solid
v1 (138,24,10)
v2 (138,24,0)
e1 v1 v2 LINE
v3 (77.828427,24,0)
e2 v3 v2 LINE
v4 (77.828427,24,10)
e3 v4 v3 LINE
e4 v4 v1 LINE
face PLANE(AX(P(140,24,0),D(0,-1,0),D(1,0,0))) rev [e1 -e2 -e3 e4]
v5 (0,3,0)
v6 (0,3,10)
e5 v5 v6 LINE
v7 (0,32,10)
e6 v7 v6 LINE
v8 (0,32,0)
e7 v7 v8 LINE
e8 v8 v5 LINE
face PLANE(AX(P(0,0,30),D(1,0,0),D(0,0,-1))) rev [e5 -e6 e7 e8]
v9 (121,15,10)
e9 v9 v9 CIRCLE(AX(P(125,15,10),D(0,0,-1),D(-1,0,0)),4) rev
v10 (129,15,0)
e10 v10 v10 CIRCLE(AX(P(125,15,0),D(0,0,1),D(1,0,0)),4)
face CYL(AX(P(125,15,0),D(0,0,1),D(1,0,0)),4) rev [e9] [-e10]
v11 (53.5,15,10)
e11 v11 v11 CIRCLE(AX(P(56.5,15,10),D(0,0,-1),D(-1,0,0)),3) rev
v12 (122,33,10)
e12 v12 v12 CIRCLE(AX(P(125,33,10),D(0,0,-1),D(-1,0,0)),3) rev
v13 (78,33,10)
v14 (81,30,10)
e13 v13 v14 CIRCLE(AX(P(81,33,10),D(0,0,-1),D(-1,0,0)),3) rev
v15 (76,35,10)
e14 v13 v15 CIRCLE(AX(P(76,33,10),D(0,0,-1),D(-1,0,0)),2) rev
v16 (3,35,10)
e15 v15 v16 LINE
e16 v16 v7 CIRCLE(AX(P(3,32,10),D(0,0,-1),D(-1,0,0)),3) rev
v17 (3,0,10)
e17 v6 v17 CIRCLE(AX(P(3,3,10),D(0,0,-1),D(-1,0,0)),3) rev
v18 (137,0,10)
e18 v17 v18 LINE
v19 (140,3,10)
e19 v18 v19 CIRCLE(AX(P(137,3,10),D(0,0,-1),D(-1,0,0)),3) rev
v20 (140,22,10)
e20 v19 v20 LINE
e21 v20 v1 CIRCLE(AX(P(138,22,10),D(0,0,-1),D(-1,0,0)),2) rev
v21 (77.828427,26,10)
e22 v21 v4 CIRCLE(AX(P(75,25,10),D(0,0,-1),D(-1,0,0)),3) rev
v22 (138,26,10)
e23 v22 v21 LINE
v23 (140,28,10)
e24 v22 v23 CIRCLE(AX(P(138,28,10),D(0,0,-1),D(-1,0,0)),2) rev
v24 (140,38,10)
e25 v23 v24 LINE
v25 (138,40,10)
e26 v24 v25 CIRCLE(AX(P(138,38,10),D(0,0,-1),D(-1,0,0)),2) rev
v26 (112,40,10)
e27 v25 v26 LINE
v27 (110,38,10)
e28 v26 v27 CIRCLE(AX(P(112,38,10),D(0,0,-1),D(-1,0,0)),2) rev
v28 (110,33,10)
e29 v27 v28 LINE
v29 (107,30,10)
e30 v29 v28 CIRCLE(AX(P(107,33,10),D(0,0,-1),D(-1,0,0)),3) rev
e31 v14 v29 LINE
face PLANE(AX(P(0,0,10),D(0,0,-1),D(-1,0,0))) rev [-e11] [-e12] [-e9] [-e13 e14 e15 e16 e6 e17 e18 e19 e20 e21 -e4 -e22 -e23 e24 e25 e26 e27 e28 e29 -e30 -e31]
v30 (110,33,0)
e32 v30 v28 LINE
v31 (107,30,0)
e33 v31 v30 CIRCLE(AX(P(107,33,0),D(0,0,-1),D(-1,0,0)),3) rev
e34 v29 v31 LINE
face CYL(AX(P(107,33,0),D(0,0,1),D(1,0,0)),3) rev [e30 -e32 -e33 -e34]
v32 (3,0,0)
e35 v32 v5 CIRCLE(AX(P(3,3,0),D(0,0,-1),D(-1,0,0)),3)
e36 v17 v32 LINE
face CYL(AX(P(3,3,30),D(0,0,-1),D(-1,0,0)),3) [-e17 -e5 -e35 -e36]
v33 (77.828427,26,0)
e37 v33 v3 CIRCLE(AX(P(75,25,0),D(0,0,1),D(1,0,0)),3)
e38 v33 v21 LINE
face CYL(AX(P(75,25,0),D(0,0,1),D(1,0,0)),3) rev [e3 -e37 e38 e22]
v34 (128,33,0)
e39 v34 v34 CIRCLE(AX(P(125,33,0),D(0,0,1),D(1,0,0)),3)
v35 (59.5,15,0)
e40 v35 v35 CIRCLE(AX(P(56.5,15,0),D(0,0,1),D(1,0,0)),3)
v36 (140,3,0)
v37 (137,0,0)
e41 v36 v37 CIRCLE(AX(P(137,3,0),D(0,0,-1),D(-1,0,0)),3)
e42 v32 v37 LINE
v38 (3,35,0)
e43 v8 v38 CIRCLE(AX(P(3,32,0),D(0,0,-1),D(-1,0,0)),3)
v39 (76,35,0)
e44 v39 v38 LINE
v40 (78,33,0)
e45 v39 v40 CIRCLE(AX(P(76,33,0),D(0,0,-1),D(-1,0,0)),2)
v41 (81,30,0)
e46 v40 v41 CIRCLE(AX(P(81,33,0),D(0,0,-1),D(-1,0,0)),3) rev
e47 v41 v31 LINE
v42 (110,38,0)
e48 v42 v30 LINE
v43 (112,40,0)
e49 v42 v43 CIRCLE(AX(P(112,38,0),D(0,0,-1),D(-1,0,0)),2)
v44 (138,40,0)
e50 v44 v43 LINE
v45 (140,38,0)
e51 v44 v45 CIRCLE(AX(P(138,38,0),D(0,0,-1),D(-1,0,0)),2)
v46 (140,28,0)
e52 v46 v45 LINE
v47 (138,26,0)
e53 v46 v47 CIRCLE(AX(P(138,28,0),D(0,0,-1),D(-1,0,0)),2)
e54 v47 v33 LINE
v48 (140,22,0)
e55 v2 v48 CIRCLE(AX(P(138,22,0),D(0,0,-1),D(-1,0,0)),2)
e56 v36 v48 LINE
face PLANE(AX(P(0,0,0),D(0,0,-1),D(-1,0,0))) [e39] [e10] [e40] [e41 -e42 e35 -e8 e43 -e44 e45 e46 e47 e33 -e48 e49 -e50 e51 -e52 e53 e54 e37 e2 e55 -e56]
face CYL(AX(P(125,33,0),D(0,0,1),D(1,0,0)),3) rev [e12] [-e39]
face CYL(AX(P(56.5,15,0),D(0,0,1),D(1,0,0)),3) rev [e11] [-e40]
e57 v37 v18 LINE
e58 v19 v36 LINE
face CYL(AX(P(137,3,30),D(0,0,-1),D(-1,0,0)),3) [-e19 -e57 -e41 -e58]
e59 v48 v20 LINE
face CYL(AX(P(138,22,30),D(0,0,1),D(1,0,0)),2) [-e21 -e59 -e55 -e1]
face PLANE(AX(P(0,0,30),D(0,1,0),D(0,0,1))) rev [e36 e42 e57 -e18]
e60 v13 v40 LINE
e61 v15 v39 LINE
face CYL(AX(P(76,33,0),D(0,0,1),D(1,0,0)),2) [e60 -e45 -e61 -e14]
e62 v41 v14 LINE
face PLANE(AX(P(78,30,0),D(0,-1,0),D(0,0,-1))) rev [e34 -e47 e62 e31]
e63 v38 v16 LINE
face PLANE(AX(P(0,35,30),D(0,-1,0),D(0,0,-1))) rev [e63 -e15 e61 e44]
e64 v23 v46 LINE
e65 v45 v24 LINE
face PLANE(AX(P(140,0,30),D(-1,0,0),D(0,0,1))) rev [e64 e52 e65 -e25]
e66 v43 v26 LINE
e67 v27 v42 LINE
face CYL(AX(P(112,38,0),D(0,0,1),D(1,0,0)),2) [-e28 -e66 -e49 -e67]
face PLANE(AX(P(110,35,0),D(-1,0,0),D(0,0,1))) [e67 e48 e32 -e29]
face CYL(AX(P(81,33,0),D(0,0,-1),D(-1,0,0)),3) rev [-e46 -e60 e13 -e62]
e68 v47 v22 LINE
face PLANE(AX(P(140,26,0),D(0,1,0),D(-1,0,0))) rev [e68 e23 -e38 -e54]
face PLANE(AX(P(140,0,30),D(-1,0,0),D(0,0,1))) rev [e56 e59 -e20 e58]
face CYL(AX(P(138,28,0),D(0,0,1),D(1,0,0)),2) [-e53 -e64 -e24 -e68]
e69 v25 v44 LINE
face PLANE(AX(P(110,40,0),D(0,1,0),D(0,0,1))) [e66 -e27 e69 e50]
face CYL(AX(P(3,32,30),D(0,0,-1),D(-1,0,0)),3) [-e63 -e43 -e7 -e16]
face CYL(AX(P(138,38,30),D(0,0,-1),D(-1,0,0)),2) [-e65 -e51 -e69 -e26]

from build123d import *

# Parameters (mm, degrees)
ESQUISSE1_W                  = 140
ESQUISSE1_H                  = 35
BOSS_EXTRU_1_DEPTH           = 30
ESQUISSE2_W                  = 33
ESQUISSE2_H                  = 35
ENL_V_MAT_EXTRU_1_DEPTH      = 20
ESQUISSE3_W                  = 30
ESQUISSE3_H                  = 5
BOSS_EXTRU_2_DEPTH           = 30
ENL_V_MAT_EXTRU_2_DEPTH      = 149.660687473
ENL_V_MAT_EXTRU_2_DEPTH_BACK = 149.660687473
ESQUISSE4_R                  = 3
ENL_V_MAT_EXTRU_3_DEPTH      = 149.660687473
ENL_V_MAT_EXTRU_3_DEPTH_BACK = 149.660687473
ESQUISSE5_W                  = 65
ESQUISSE5_H                  = 2
ENL_V_MAT_EXTRU_4_DEPTH      = 149.660687473
ENL_V_MAT_EXTRU_4_DEPTH_BACK = 149.660687473
ESQUISSE6_W                  = 32
ESQUISSE6_H                  = 5
CONG_1_R                     = 3
ENL_V_MAT_EXTRU_6_DEPTH      = 15
ENL_V_MAT_EXTRU_5_DEPTH      = 149.660687473
ENL_V_MAT_EXTRU_5_DEPTH_BACK = 149.660687473
ESQUISSE7_R                  = 4
CONG_2_R                     = 3
CONG_3_R                     = 2
ENL_V_MAT_EXTRU_8_DEPTH      = 149.660687473
ENL_V_MAT_EXTRU_8_DEPTH_BACK = 149.660687473
ESQUISSE10_R                 = 3
ESQUISSE9_W                  = 140
ESQUISSE9_H                  = 40
ENL_V_MAT_EXTRU_7_DEPTH      = 20


with BuildPart() as part:
    # Esquisse1 → Boss.-Extru.1 (new body)
    with BuildSketch(Plane.XY):
        with Locations((70, 17.5)):
            Rectangle(ESQUISSE1_W, ESQUISSE1_H)
    extrude(amount=BOSS_EXTRU_1_DEPTH)

    # Esquisse2 → Enlèv. mat.-Extru.1 (cut)
    with BuildSketch(Plane.XY.offset(30)):
        with Locations((25, 17.5)):
            Rectangle(ESQUISSE2_W, ESQUISSE2_H)
    extrude(amount=-ENL_V_MAT_EXTRU_1_DEPTH, mode=Mode.SUBTRACT)

    # Esquisse3 → Boss.-Extru.2 (add)
    with BuildSketch(Plane.XY.offset(30)):
        with Locations((125, 37.5)):
            Rectangle(ESQUISSE3_W, ESQUISSE3_H)
    extrude(amount=-BOSS_EXTRU_2_DEPTH)

    # Esquisse4 → Enlèv. mat.-Extru.2 (cut, two sides: drawn at the far end of the back side and taken through both)
    with BuildSketch(Plane.XY.offset(30).offset(-ENL_V_MAT_EXTRU_2_DEPTH_BACK)):
        with Locations((75, 25)):
            Circle(ESQUISSE4_R)
    extrude(amount=ENL_V_MAT_EXTRU_2_DEPTH + ENL_V_MAT_EXTRU_2_DEPTH_BACK, mode=Mode.SUBTRACT)

    # Esquisse5 → Enlèv. mat.-Extru.3 (cut, two sides: drawn at the far end of the back side and taken through both)
    with BuildSketch(Plane.XY.offset(30).offset(-ENL_V_MAT_EXTRU_3_DEPTH_BACK)):
        with Locations((107.5, 25)):
            Rectangle(ESQUISSE5_W, ESQUISSE5_H)
    extrude(amount=ENL_V_MAT_EXTRU_3_DEPTH + ENL_V_MAT_EXTRU_3_DEPTH_BACK, mode=Mode.SUBTRACT)

    # Esquisse6 → Enlèv. mat.-Extru.4 (cut, two sides: drawn at the far end of the back side and taken through both)
    with BuildSketch(Plane.XY.offset(30).offset(-ENL_V_MAT_EXTRU_4_DEPTH_BACK)):
        with Locations((94, 32.5)):
            Rectangle(ESQUISSE6_W, ESQUISSE6_H)
    extrude(amount=ENL_V_MAT_EXTRU_4_DEPTH + ENL_V_MAT_EXTRU_4_DEPTH_BACK, mode=Mode.SUBTRACT)

    # Congé1
    cong_1_edges = [part.edges().sort_by_distance(p)[0] for p in [
        (78, 30, 15),
        (110, 30, 15),
    ]]
    fillet(cong_1_edges, radius=CONG_1_R)

    # Esquisse8 → Enlèv. mat.-Extru.6 (cut)
    with BuildSketch(Plane.XY.offset(30)):
        Polygon((72, 0), (140, 0), (140, 24), (106.275552162, 24), align=None)
    extrude(amount=-ENL_V_MAT_EXTRU_6_DEPTH, mode=Mode.SUBTRACT)

    # Esquisse7 → Enlèv. mat.-Extru.5 (cut, two sides: drawn at the far end of the back side and taken through both)
    with BuildSketch(Plane.XY.offset(30).offset(-ENL_V_MAT_EXTRU_5_DEPTH_BACK)):
        with Locations((125, 15)):
            Circle(ESQUISSE7_R)
    extrude(amount=ENL_V_MAT_EXTRU_5_DEPTH + ENL_V_MAT_EXTRU_5_DEPTH_BACK, mode=Mode.SUBTRACT)

    # Congé2
    cong_2_edges = [part.edges().sort_by_distance(p)[0] for p in [
        (140, 0, 7.5),
        (72, 0, 22.5),
        (0, 35, 15),
        (0, 0, 15),
    ]]
    fillet(cong_2_edges, radius=CONG_2_R)

    # Congé3
    cong_3_edges = [part.edges().sort_by_distance(p)[0] for p in [
        (106.275552162, 24, 22.5),
        (8.5, 0, 20),
        (8.5, 35, 20),
        (41.5, 35, 20),
        (41.5, 0, 20),
        (110, 40, 15),
        (140, 40, 15),
        (140, 26, 15),
        (140, 24, 7.5),
        (78, 35, 15),
    ]]
    fillet(cong_3_edges, radius=CONG_3_R - 0.0001)  # a hair under: the kernel refuses the full size

    # Esquisse10 → Enlèv. mat.-Extru.8 (cut, two sides: drawn at the far end of the back side and taken through both)
    with BuildSketch(Plane.XY.offset(30).offset(-ENL_V_MAT_EXTRU_8_DEPTH_BACK)):
        with Locations((56.5, 15)):
            Circle(ESQUISSE10_R)
        with Locations((125, 33)):
            Circle(ESQUISSE10_R)
    extrude(amount=ENL_V_MAT_EXTRU_8_DEPTH + ENL_V_MAT_EXTRU_8_DEPTH_BACK, mode=Mode.SUBTRACT)

    # Esquisse9 → Enlèv. mat.-Extru.7 (cut)
    with BuildSketch(Plane.XY.offset(30)):
        with Locations((70, 20)):
            Rectangle(ESQUISSE9_W, ESQUISSE9_H)
    extrude(amount=-ENL_V_MAT_EXTRU_7_DEPTH, mode=Mode.SUBTRACT)


solid = part.part
